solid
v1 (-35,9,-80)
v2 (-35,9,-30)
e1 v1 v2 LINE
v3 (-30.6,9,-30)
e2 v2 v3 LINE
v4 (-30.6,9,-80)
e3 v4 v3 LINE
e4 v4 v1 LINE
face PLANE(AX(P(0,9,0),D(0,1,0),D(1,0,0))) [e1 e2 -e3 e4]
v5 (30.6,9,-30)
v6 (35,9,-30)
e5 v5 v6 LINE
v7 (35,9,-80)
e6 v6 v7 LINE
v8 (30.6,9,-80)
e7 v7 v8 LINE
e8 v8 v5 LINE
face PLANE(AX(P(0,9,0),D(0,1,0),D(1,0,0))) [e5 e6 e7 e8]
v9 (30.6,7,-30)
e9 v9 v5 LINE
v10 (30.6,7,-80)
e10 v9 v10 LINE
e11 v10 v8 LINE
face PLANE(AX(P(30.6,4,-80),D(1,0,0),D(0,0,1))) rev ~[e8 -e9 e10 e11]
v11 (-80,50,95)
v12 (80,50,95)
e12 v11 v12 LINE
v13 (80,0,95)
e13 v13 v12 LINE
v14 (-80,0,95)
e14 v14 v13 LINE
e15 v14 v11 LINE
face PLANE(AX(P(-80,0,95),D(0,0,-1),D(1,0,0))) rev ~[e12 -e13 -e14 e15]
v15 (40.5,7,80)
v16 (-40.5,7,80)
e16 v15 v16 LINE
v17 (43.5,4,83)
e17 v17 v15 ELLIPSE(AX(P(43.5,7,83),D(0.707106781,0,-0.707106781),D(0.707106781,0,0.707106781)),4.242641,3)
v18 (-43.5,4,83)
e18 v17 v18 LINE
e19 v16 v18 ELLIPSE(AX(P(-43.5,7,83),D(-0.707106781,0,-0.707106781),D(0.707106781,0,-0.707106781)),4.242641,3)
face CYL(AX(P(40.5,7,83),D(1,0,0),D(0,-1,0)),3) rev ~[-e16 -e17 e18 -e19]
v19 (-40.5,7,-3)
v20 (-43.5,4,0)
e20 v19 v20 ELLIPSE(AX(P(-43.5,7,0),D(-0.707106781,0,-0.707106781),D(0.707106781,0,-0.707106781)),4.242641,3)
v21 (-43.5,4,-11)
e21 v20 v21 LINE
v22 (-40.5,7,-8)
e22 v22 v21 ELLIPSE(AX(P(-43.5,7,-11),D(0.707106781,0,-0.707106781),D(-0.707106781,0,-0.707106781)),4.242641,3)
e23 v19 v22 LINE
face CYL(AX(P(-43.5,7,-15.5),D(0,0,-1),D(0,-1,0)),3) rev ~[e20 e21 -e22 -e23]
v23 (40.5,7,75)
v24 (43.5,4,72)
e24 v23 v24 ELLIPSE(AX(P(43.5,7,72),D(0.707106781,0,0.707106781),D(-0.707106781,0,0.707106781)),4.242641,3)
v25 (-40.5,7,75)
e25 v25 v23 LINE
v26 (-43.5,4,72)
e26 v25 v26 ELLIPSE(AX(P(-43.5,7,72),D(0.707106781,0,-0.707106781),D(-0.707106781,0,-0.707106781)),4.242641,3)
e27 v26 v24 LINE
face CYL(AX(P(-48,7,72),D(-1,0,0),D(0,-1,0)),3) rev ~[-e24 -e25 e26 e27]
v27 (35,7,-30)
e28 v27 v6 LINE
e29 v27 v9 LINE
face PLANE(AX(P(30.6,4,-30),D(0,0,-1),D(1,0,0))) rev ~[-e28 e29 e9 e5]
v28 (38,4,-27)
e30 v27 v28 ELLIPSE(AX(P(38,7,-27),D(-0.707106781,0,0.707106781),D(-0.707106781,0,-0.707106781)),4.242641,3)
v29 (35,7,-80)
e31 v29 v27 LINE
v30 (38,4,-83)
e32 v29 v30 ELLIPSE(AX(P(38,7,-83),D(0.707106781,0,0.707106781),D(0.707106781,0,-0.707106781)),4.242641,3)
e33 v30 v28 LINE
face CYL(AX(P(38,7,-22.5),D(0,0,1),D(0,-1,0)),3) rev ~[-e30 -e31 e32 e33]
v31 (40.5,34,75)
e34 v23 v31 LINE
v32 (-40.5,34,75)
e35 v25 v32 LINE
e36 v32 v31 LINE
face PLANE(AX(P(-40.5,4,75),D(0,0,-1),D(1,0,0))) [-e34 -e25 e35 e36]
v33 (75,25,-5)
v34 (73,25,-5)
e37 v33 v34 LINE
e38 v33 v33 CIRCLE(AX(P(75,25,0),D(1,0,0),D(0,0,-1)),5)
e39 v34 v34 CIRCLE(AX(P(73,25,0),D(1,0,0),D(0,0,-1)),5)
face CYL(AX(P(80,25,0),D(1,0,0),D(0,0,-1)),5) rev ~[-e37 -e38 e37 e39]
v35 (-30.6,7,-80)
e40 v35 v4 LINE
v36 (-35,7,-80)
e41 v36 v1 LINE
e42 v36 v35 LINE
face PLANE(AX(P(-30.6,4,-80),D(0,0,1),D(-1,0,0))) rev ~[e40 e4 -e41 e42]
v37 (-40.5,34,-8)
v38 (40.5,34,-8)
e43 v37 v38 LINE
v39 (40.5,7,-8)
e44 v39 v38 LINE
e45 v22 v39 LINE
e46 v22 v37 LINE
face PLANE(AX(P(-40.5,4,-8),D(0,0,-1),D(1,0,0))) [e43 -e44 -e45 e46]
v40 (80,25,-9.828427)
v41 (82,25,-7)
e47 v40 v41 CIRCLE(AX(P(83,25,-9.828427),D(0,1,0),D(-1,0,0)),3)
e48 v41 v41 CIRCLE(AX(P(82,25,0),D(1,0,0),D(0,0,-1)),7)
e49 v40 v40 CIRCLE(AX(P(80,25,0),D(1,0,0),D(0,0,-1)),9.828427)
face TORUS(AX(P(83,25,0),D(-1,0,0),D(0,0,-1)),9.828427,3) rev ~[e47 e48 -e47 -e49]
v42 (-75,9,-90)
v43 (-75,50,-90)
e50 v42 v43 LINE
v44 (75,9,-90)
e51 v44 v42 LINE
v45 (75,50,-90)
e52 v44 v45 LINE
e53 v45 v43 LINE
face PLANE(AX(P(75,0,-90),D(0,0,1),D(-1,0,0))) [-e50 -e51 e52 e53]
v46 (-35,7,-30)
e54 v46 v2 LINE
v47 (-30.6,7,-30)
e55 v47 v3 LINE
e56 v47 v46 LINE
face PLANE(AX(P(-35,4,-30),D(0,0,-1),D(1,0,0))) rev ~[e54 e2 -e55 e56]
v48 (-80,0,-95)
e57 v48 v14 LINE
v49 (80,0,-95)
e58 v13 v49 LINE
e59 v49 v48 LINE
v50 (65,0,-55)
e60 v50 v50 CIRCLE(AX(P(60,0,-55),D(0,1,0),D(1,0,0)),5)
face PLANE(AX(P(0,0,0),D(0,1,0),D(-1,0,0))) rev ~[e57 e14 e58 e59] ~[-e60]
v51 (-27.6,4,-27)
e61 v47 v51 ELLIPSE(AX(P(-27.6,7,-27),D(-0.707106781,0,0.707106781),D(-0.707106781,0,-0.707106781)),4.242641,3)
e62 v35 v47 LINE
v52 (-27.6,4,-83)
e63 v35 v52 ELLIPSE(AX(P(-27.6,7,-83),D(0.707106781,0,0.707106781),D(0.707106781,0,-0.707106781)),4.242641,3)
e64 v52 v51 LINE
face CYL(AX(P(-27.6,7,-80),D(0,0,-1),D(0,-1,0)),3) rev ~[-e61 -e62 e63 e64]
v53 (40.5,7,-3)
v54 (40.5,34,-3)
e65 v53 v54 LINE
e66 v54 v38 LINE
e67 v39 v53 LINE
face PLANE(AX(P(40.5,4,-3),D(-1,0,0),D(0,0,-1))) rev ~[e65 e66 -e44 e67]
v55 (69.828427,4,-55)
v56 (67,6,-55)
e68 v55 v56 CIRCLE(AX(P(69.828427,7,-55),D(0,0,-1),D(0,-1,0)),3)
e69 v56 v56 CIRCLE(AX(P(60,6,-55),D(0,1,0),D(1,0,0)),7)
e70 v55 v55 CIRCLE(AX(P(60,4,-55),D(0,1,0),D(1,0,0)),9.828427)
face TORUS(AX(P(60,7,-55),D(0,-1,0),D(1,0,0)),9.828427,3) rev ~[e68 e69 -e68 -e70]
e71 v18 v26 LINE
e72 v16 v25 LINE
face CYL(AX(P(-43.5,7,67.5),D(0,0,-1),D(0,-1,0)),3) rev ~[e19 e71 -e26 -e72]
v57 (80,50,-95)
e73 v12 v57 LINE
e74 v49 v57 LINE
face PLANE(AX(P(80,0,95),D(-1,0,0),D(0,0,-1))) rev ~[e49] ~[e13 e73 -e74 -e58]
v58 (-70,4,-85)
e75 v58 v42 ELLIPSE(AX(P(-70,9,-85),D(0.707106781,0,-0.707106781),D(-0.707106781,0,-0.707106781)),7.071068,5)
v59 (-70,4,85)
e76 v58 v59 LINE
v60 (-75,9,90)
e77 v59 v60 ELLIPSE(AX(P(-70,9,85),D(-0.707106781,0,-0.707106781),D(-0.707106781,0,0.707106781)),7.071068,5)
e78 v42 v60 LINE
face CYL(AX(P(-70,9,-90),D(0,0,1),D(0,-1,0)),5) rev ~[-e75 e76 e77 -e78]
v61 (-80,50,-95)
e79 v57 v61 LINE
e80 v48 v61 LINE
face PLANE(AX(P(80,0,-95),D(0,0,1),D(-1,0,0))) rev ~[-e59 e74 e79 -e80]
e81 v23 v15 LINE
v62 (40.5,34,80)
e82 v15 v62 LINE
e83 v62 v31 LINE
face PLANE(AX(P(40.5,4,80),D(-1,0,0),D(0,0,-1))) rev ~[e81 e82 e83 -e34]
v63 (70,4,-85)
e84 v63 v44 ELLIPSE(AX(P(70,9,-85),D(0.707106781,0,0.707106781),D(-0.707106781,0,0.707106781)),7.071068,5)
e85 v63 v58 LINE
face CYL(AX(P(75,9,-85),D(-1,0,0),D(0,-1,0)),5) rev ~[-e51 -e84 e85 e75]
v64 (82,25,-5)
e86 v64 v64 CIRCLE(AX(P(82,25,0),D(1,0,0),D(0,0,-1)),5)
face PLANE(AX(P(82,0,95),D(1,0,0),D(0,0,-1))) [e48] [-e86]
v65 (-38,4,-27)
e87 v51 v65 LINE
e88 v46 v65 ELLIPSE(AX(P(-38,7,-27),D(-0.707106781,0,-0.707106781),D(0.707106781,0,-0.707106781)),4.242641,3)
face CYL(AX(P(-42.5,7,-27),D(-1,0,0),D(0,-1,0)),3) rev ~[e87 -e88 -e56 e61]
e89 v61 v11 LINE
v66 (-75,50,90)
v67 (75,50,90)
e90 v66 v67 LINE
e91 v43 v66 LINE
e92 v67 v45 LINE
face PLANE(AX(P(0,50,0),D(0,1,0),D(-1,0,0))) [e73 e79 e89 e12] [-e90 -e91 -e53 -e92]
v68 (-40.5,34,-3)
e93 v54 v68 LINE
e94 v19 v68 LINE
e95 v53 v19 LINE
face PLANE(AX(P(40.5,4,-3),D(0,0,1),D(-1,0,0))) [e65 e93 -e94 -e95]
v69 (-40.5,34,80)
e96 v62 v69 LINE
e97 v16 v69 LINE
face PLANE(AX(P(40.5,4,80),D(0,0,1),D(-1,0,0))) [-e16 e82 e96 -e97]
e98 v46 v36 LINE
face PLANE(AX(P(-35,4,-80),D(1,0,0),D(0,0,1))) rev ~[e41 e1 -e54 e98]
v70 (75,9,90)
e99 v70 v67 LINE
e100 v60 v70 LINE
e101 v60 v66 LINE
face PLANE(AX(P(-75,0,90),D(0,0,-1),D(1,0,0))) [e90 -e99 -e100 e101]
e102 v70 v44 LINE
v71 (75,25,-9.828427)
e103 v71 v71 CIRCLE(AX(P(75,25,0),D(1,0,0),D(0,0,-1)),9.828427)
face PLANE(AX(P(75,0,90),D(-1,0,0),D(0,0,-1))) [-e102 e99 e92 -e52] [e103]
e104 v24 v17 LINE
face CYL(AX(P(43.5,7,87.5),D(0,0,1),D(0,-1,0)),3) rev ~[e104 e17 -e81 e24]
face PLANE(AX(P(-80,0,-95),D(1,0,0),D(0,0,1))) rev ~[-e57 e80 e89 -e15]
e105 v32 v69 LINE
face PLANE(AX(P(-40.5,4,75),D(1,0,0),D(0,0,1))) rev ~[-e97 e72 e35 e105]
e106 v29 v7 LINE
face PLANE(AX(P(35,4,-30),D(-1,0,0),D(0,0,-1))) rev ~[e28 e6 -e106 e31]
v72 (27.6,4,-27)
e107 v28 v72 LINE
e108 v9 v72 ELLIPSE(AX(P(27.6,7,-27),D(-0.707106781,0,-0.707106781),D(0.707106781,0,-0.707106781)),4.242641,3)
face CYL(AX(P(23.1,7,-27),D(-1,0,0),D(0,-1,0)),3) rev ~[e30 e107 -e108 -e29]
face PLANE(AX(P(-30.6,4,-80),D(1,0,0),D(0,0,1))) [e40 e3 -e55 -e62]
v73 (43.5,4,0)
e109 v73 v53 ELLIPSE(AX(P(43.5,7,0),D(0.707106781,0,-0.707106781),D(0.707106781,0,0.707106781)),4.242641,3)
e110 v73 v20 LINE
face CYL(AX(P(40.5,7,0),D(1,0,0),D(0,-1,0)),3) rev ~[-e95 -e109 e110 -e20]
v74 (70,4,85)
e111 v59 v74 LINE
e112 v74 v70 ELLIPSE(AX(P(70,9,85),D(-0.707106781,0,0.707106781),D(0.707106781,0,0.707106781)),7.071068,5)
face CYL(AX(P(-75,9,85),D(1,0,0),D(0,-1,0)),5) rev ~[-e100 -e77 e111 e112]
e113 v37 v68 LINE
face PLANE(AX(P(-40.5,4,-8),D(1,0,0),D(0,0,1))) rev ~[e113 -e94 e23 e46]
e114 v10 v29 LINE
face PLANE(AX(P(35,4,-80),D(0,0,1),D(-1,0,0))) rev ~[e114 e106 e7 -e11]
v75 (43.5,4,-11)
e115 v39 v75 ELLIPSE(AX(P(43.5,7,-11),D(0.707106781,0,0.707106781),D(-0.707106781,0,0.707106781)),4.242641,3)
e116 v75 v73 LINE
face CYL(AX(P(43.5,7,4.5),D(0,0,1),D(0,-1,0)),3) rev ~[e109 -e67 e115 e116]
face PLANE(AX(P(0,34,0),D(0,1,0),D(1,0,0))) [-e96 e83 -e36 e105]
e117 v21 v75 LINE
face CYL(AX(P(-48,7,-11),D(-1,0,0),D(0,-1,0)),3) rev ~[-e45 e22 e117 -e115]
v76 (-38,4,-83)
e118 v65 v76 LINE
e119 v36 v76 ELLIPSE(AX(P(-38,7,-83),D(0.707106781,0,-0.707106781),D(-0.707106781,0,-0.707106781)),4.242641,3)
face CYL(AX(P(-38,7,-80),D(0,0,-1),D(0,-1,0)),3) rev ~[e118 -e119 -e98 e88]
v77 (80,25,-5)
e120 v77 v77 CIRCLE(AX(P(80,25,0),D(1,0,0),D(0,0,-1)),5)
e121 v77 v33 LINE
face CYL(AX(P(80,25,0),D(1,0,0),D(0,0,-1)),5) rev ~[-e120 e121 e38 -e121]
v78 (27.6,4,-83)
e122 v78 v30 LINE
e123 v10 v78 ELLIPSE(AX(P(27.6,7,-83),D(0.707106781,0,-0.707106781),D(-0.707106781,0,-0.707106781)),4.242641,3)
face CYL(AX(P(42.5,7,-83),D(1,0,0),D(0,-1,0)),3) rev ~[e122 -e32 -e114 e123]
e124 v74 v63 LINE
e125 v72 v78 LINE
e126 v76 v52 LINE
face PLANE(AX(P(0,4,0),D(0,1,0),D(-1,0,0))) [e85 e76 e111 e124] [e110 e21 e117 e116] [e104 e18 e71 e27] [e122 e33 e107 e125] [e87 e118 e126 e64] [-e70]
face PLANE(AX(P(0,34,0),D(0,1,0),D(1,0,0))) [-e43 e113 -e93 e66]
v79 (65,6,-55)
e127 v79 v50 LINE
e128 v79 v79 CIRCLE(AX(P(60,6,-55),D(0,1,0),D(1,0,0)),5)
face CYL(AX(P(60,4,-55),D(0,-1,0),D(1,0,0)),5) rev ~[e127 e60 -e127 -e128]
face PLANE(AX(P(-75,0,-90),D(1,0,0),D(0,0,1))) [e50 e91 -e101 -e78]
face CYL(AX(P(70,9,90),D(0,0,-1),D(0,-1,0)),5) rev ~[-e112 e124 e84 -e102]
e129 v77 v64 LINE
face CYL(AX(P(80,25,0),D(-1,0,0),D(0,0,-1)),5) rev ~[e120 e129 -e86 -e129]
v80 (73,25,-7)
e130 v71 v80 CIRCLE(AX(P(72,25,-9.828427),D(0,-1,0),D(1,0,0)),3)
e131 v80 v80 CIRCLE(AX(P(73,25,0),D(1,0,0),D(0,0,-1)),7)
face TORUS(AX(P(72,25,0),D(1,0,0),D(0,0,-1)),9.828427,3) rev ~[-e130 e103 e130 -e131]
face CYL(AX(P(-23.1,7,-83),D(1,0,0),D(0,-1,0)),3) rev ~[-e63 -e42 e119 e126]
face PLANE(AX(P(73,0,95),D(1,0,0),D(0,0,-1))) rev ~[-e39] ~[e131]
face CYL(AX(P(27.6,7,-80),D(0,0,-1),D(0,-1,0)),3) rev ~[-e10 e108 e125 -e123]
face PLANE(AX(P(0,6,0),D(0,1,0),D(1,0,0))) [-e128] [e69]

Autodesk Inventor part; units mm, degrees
ref_plane "YZ Plane" through (0, 0, 0) normal (1, 0, 0) x (0, 1, 0)
ref_plane "XZ Plane" through (0, 0, 0) normal (0, 1, 0) x (-1, 0, 0)
ref_plane "XY Plane" through (0, 0, 0) normal (0, 0, 1) x (1, 0, 0)
sketch "Esboço1" plane through (0, 0, 0) normal (0, 1, 0) x (-1, 0, 0)
  line L0 (75, 90) -> (-75, 90)
  line L1 (-75, 90) -> (-75, -90)
  line L2 (-75, -90) -> (75, -90)
  line L3 (75, -90) -> (75, 90)
  line L4 (75, 90) -> (-75, -90) construction
  line L5 (-75, 90) -> (75, -90) construction
  line L6 (50.5, 80) -> (-50.5, 80) construction
  line L7 (-50.5, 80) -> (-50.5, -8) construction
  line L8 (-50.5, -8) -> (50.5, -8) construction
  line L9 (50.5, -8) -> (50.5, 80) construction
  line L10 (50.5, 80) -> (-50.5, -8) construction
  line L11 (-50.5, 80) -> (50.5, -8) construction
  line L12 (35, -30) -> (-35, -30) construction
  line L13 (-35, -30) -> (-35, -80) construction
  line L14 (-35, -80) -> (35, -80) construction
  line L15 (35, -80) -> (35, -30) construction
  line L16 (35, -30) -> (-35, -80) construction
  line L17 (-35, -30) -> (35, -80) construction
  line L18 (0, 90) -> (0, -90) construction
  line L19 (80, 95) -> (-80, 95)
  line L20 (-80, 95) -> (-80, -95)
  line L21 (-80, -95) -> (80, -95)
  line L22 (80, -95) -> (80, 95)
  point P0 (0, 0)
  point P1 (0, 36)
  point P2 (0, -55)
  dimension "d0" = 150
  dimension "d1" = 180
  dimension "d2" = 101
  dimension "d3" = 88
  dimension "d4" = 70
  dimension "d5" = 50
  dimension "d6" = 10
  dimension "d7" = 10
  dimension "d8" = 5
extrude "Extrusão1" add sketch "Esboço1" along normal blind 50
extrude "Extrusion2" add sketch "Esboço1" along normal blind 4 contours L3 L2 L1 L0
sketch "SaidaCarga" plane through (80, 0, 95) normal (1, 0, 0) x (0, 0, -1)
  line L0 (0, 50) -> (190, 50) projected
  line L1 (0, 50) -> (190, 0) construction
  circle A0 centre (95, 25) radius 5
  circle A1 centre (95, 25) radius 7
  point P0 (95, 0)
  dimension "d13" = 10
  dimension "d14" = 2
sketch "Sketch3" plane through (0, 4, 0) normal (0, 1, 0) x (1, 0, 0)
  line L0 (-50.5, -80) -> (50.5, -80) construction
  line L1 (50.5, -80) -> (50.5, 8) construction
  line L2 (-50.5, 8) -> (-50.5, -80) construction
  line L3 (50.5, 8) -> (-50.5, 8) construction
  line L4 (-35, 30) -> (35, 30) construction
  line L5 (35, 30) -> (35, 80) construction
  line L6 (35, 80) -> (-35, 80) construction
  line L7 (-35, 80) -> (-35, 30) construction
  circle A0 centre (60, 55) radius 5
  circle A1 centre (60, 55) radius 7
  line L8 (75, 90) -> (75, -90) projected
  line L9 (-75, 90) -> (75, 90) projected
  line L10 (-35, 30) -> (35, 30)
  line L11 (35, 30) -> (35, 80)
  line L12 (35, 80) -> (-35, 80)
  line L13 (-35, 80) -> (-35, 30)
  circle A2 centre (-32.8, 32.2) radius 1.1
  line L14 (-35, 55) -> (35, 55) construction
  circle A3 centre (-32.8, 77.8) radius 1.1
  line L15 (0, 30) -> (0, 80) construction
  circle A4 centre (32.8, 32.2) radius 1.1
  circle A5 centre (32.8, 77.8) radius 1.1
  line L16 (-30.6, 34.4) -> (-35, 30) construction
  line L17 (-35, 34.4) -> (-30.6, 30) construction
  line L18 (-30.6, 80) -> (-30.6, 30)
  line L19 (30.6, 80) -> (30.6, 30)
  line L20 (-50.5, -75) -> (50.5, -75)
  line L21 (-40.5, 8) -> (-40.5, -80)
  line L22 (50.5, 3) -> (-50.5, 3)
  line L23 (40.5, -80) -> (40.5, 8)
  line L24 (-50.5, 8) -> (50.5, 8)
  line L25 (50.5, 8) -> (50.5, -80)
  line L26 (50.5, -80) -> (-50.5, -80)
  line L27 (-50.5, -80) -> (-50.5, 8)
  point P0 (0, 0)
  point P1 (30.6, 30)
  point P2 (40.5, 8)
  point P3 (-40.5, 3)
  point P4 (40.5, 3)
  point P5 (40.5, -75)
  point P6 (-40.5, -75)
  dimension "d15" = 10
  dimension "d16" = 2
  dimension "d17" = 15
  dimension "d18" = 35
  dimension "d29" = 2.2
  dimension "d30" = 2.2
  dimension "d31" = 2.2
  dimension "d32" = 4.4
  dimension "d35" = 5
  dimension "d36" = 10
  dimension "d37" = 5
  dimension "d38" = 10
extrude "Extrusion3" cut sketch "Sketch3" against normal blind 4 contours A0
extrude "Extrusion4" add sketch "Sketch3" along normal blind 2 contours A1
extrude "Extrusion5" cut sketch "SaidaCarga" against normal blind 5 contours A0
extrude "Extrusion6" add sketch "SaidaCarga" along normal blind 2 and the other way blind 7
extrude "Extrusion7" add sketch "Sketch3" along normal blind 5 contours L13 L12 L18 L10 | L19 L12 L11 L10 | A2 | A3 | A4 | A5
extrude "Extrusion8" add sketch "Sketch3" along normal blind 30 contours L20 L23 L26 L21 | L21 L24 L23 L22
fillet "Fillet1" radius 5 4 edges at (0, 4, -90) (-75, 4, 0) (0, 4, 90) (75, 4, 0)
fillet "Fillet2" radius 3 19 edges at (0, 4, -3) (40.5, 4, -5.5) (0, 4, -8) (-40.5, 4, -5.5) (0, 4, 75) (-40.5, 4, 77.5) (0, 4, 80) (40.5, 4, 77.5) (35, 4, -55) (30.6, 4, -55) (32.8, 4, -30) (32.8, 4, -80) (-30.6, 4, -55) (-32.8, 4, -30) (-35, 4, -55) (-32.8, 4, -80) (80, 25, 7) (75, 25, 7) (53, 4, -55)
properties part number "CaseBitDog"
